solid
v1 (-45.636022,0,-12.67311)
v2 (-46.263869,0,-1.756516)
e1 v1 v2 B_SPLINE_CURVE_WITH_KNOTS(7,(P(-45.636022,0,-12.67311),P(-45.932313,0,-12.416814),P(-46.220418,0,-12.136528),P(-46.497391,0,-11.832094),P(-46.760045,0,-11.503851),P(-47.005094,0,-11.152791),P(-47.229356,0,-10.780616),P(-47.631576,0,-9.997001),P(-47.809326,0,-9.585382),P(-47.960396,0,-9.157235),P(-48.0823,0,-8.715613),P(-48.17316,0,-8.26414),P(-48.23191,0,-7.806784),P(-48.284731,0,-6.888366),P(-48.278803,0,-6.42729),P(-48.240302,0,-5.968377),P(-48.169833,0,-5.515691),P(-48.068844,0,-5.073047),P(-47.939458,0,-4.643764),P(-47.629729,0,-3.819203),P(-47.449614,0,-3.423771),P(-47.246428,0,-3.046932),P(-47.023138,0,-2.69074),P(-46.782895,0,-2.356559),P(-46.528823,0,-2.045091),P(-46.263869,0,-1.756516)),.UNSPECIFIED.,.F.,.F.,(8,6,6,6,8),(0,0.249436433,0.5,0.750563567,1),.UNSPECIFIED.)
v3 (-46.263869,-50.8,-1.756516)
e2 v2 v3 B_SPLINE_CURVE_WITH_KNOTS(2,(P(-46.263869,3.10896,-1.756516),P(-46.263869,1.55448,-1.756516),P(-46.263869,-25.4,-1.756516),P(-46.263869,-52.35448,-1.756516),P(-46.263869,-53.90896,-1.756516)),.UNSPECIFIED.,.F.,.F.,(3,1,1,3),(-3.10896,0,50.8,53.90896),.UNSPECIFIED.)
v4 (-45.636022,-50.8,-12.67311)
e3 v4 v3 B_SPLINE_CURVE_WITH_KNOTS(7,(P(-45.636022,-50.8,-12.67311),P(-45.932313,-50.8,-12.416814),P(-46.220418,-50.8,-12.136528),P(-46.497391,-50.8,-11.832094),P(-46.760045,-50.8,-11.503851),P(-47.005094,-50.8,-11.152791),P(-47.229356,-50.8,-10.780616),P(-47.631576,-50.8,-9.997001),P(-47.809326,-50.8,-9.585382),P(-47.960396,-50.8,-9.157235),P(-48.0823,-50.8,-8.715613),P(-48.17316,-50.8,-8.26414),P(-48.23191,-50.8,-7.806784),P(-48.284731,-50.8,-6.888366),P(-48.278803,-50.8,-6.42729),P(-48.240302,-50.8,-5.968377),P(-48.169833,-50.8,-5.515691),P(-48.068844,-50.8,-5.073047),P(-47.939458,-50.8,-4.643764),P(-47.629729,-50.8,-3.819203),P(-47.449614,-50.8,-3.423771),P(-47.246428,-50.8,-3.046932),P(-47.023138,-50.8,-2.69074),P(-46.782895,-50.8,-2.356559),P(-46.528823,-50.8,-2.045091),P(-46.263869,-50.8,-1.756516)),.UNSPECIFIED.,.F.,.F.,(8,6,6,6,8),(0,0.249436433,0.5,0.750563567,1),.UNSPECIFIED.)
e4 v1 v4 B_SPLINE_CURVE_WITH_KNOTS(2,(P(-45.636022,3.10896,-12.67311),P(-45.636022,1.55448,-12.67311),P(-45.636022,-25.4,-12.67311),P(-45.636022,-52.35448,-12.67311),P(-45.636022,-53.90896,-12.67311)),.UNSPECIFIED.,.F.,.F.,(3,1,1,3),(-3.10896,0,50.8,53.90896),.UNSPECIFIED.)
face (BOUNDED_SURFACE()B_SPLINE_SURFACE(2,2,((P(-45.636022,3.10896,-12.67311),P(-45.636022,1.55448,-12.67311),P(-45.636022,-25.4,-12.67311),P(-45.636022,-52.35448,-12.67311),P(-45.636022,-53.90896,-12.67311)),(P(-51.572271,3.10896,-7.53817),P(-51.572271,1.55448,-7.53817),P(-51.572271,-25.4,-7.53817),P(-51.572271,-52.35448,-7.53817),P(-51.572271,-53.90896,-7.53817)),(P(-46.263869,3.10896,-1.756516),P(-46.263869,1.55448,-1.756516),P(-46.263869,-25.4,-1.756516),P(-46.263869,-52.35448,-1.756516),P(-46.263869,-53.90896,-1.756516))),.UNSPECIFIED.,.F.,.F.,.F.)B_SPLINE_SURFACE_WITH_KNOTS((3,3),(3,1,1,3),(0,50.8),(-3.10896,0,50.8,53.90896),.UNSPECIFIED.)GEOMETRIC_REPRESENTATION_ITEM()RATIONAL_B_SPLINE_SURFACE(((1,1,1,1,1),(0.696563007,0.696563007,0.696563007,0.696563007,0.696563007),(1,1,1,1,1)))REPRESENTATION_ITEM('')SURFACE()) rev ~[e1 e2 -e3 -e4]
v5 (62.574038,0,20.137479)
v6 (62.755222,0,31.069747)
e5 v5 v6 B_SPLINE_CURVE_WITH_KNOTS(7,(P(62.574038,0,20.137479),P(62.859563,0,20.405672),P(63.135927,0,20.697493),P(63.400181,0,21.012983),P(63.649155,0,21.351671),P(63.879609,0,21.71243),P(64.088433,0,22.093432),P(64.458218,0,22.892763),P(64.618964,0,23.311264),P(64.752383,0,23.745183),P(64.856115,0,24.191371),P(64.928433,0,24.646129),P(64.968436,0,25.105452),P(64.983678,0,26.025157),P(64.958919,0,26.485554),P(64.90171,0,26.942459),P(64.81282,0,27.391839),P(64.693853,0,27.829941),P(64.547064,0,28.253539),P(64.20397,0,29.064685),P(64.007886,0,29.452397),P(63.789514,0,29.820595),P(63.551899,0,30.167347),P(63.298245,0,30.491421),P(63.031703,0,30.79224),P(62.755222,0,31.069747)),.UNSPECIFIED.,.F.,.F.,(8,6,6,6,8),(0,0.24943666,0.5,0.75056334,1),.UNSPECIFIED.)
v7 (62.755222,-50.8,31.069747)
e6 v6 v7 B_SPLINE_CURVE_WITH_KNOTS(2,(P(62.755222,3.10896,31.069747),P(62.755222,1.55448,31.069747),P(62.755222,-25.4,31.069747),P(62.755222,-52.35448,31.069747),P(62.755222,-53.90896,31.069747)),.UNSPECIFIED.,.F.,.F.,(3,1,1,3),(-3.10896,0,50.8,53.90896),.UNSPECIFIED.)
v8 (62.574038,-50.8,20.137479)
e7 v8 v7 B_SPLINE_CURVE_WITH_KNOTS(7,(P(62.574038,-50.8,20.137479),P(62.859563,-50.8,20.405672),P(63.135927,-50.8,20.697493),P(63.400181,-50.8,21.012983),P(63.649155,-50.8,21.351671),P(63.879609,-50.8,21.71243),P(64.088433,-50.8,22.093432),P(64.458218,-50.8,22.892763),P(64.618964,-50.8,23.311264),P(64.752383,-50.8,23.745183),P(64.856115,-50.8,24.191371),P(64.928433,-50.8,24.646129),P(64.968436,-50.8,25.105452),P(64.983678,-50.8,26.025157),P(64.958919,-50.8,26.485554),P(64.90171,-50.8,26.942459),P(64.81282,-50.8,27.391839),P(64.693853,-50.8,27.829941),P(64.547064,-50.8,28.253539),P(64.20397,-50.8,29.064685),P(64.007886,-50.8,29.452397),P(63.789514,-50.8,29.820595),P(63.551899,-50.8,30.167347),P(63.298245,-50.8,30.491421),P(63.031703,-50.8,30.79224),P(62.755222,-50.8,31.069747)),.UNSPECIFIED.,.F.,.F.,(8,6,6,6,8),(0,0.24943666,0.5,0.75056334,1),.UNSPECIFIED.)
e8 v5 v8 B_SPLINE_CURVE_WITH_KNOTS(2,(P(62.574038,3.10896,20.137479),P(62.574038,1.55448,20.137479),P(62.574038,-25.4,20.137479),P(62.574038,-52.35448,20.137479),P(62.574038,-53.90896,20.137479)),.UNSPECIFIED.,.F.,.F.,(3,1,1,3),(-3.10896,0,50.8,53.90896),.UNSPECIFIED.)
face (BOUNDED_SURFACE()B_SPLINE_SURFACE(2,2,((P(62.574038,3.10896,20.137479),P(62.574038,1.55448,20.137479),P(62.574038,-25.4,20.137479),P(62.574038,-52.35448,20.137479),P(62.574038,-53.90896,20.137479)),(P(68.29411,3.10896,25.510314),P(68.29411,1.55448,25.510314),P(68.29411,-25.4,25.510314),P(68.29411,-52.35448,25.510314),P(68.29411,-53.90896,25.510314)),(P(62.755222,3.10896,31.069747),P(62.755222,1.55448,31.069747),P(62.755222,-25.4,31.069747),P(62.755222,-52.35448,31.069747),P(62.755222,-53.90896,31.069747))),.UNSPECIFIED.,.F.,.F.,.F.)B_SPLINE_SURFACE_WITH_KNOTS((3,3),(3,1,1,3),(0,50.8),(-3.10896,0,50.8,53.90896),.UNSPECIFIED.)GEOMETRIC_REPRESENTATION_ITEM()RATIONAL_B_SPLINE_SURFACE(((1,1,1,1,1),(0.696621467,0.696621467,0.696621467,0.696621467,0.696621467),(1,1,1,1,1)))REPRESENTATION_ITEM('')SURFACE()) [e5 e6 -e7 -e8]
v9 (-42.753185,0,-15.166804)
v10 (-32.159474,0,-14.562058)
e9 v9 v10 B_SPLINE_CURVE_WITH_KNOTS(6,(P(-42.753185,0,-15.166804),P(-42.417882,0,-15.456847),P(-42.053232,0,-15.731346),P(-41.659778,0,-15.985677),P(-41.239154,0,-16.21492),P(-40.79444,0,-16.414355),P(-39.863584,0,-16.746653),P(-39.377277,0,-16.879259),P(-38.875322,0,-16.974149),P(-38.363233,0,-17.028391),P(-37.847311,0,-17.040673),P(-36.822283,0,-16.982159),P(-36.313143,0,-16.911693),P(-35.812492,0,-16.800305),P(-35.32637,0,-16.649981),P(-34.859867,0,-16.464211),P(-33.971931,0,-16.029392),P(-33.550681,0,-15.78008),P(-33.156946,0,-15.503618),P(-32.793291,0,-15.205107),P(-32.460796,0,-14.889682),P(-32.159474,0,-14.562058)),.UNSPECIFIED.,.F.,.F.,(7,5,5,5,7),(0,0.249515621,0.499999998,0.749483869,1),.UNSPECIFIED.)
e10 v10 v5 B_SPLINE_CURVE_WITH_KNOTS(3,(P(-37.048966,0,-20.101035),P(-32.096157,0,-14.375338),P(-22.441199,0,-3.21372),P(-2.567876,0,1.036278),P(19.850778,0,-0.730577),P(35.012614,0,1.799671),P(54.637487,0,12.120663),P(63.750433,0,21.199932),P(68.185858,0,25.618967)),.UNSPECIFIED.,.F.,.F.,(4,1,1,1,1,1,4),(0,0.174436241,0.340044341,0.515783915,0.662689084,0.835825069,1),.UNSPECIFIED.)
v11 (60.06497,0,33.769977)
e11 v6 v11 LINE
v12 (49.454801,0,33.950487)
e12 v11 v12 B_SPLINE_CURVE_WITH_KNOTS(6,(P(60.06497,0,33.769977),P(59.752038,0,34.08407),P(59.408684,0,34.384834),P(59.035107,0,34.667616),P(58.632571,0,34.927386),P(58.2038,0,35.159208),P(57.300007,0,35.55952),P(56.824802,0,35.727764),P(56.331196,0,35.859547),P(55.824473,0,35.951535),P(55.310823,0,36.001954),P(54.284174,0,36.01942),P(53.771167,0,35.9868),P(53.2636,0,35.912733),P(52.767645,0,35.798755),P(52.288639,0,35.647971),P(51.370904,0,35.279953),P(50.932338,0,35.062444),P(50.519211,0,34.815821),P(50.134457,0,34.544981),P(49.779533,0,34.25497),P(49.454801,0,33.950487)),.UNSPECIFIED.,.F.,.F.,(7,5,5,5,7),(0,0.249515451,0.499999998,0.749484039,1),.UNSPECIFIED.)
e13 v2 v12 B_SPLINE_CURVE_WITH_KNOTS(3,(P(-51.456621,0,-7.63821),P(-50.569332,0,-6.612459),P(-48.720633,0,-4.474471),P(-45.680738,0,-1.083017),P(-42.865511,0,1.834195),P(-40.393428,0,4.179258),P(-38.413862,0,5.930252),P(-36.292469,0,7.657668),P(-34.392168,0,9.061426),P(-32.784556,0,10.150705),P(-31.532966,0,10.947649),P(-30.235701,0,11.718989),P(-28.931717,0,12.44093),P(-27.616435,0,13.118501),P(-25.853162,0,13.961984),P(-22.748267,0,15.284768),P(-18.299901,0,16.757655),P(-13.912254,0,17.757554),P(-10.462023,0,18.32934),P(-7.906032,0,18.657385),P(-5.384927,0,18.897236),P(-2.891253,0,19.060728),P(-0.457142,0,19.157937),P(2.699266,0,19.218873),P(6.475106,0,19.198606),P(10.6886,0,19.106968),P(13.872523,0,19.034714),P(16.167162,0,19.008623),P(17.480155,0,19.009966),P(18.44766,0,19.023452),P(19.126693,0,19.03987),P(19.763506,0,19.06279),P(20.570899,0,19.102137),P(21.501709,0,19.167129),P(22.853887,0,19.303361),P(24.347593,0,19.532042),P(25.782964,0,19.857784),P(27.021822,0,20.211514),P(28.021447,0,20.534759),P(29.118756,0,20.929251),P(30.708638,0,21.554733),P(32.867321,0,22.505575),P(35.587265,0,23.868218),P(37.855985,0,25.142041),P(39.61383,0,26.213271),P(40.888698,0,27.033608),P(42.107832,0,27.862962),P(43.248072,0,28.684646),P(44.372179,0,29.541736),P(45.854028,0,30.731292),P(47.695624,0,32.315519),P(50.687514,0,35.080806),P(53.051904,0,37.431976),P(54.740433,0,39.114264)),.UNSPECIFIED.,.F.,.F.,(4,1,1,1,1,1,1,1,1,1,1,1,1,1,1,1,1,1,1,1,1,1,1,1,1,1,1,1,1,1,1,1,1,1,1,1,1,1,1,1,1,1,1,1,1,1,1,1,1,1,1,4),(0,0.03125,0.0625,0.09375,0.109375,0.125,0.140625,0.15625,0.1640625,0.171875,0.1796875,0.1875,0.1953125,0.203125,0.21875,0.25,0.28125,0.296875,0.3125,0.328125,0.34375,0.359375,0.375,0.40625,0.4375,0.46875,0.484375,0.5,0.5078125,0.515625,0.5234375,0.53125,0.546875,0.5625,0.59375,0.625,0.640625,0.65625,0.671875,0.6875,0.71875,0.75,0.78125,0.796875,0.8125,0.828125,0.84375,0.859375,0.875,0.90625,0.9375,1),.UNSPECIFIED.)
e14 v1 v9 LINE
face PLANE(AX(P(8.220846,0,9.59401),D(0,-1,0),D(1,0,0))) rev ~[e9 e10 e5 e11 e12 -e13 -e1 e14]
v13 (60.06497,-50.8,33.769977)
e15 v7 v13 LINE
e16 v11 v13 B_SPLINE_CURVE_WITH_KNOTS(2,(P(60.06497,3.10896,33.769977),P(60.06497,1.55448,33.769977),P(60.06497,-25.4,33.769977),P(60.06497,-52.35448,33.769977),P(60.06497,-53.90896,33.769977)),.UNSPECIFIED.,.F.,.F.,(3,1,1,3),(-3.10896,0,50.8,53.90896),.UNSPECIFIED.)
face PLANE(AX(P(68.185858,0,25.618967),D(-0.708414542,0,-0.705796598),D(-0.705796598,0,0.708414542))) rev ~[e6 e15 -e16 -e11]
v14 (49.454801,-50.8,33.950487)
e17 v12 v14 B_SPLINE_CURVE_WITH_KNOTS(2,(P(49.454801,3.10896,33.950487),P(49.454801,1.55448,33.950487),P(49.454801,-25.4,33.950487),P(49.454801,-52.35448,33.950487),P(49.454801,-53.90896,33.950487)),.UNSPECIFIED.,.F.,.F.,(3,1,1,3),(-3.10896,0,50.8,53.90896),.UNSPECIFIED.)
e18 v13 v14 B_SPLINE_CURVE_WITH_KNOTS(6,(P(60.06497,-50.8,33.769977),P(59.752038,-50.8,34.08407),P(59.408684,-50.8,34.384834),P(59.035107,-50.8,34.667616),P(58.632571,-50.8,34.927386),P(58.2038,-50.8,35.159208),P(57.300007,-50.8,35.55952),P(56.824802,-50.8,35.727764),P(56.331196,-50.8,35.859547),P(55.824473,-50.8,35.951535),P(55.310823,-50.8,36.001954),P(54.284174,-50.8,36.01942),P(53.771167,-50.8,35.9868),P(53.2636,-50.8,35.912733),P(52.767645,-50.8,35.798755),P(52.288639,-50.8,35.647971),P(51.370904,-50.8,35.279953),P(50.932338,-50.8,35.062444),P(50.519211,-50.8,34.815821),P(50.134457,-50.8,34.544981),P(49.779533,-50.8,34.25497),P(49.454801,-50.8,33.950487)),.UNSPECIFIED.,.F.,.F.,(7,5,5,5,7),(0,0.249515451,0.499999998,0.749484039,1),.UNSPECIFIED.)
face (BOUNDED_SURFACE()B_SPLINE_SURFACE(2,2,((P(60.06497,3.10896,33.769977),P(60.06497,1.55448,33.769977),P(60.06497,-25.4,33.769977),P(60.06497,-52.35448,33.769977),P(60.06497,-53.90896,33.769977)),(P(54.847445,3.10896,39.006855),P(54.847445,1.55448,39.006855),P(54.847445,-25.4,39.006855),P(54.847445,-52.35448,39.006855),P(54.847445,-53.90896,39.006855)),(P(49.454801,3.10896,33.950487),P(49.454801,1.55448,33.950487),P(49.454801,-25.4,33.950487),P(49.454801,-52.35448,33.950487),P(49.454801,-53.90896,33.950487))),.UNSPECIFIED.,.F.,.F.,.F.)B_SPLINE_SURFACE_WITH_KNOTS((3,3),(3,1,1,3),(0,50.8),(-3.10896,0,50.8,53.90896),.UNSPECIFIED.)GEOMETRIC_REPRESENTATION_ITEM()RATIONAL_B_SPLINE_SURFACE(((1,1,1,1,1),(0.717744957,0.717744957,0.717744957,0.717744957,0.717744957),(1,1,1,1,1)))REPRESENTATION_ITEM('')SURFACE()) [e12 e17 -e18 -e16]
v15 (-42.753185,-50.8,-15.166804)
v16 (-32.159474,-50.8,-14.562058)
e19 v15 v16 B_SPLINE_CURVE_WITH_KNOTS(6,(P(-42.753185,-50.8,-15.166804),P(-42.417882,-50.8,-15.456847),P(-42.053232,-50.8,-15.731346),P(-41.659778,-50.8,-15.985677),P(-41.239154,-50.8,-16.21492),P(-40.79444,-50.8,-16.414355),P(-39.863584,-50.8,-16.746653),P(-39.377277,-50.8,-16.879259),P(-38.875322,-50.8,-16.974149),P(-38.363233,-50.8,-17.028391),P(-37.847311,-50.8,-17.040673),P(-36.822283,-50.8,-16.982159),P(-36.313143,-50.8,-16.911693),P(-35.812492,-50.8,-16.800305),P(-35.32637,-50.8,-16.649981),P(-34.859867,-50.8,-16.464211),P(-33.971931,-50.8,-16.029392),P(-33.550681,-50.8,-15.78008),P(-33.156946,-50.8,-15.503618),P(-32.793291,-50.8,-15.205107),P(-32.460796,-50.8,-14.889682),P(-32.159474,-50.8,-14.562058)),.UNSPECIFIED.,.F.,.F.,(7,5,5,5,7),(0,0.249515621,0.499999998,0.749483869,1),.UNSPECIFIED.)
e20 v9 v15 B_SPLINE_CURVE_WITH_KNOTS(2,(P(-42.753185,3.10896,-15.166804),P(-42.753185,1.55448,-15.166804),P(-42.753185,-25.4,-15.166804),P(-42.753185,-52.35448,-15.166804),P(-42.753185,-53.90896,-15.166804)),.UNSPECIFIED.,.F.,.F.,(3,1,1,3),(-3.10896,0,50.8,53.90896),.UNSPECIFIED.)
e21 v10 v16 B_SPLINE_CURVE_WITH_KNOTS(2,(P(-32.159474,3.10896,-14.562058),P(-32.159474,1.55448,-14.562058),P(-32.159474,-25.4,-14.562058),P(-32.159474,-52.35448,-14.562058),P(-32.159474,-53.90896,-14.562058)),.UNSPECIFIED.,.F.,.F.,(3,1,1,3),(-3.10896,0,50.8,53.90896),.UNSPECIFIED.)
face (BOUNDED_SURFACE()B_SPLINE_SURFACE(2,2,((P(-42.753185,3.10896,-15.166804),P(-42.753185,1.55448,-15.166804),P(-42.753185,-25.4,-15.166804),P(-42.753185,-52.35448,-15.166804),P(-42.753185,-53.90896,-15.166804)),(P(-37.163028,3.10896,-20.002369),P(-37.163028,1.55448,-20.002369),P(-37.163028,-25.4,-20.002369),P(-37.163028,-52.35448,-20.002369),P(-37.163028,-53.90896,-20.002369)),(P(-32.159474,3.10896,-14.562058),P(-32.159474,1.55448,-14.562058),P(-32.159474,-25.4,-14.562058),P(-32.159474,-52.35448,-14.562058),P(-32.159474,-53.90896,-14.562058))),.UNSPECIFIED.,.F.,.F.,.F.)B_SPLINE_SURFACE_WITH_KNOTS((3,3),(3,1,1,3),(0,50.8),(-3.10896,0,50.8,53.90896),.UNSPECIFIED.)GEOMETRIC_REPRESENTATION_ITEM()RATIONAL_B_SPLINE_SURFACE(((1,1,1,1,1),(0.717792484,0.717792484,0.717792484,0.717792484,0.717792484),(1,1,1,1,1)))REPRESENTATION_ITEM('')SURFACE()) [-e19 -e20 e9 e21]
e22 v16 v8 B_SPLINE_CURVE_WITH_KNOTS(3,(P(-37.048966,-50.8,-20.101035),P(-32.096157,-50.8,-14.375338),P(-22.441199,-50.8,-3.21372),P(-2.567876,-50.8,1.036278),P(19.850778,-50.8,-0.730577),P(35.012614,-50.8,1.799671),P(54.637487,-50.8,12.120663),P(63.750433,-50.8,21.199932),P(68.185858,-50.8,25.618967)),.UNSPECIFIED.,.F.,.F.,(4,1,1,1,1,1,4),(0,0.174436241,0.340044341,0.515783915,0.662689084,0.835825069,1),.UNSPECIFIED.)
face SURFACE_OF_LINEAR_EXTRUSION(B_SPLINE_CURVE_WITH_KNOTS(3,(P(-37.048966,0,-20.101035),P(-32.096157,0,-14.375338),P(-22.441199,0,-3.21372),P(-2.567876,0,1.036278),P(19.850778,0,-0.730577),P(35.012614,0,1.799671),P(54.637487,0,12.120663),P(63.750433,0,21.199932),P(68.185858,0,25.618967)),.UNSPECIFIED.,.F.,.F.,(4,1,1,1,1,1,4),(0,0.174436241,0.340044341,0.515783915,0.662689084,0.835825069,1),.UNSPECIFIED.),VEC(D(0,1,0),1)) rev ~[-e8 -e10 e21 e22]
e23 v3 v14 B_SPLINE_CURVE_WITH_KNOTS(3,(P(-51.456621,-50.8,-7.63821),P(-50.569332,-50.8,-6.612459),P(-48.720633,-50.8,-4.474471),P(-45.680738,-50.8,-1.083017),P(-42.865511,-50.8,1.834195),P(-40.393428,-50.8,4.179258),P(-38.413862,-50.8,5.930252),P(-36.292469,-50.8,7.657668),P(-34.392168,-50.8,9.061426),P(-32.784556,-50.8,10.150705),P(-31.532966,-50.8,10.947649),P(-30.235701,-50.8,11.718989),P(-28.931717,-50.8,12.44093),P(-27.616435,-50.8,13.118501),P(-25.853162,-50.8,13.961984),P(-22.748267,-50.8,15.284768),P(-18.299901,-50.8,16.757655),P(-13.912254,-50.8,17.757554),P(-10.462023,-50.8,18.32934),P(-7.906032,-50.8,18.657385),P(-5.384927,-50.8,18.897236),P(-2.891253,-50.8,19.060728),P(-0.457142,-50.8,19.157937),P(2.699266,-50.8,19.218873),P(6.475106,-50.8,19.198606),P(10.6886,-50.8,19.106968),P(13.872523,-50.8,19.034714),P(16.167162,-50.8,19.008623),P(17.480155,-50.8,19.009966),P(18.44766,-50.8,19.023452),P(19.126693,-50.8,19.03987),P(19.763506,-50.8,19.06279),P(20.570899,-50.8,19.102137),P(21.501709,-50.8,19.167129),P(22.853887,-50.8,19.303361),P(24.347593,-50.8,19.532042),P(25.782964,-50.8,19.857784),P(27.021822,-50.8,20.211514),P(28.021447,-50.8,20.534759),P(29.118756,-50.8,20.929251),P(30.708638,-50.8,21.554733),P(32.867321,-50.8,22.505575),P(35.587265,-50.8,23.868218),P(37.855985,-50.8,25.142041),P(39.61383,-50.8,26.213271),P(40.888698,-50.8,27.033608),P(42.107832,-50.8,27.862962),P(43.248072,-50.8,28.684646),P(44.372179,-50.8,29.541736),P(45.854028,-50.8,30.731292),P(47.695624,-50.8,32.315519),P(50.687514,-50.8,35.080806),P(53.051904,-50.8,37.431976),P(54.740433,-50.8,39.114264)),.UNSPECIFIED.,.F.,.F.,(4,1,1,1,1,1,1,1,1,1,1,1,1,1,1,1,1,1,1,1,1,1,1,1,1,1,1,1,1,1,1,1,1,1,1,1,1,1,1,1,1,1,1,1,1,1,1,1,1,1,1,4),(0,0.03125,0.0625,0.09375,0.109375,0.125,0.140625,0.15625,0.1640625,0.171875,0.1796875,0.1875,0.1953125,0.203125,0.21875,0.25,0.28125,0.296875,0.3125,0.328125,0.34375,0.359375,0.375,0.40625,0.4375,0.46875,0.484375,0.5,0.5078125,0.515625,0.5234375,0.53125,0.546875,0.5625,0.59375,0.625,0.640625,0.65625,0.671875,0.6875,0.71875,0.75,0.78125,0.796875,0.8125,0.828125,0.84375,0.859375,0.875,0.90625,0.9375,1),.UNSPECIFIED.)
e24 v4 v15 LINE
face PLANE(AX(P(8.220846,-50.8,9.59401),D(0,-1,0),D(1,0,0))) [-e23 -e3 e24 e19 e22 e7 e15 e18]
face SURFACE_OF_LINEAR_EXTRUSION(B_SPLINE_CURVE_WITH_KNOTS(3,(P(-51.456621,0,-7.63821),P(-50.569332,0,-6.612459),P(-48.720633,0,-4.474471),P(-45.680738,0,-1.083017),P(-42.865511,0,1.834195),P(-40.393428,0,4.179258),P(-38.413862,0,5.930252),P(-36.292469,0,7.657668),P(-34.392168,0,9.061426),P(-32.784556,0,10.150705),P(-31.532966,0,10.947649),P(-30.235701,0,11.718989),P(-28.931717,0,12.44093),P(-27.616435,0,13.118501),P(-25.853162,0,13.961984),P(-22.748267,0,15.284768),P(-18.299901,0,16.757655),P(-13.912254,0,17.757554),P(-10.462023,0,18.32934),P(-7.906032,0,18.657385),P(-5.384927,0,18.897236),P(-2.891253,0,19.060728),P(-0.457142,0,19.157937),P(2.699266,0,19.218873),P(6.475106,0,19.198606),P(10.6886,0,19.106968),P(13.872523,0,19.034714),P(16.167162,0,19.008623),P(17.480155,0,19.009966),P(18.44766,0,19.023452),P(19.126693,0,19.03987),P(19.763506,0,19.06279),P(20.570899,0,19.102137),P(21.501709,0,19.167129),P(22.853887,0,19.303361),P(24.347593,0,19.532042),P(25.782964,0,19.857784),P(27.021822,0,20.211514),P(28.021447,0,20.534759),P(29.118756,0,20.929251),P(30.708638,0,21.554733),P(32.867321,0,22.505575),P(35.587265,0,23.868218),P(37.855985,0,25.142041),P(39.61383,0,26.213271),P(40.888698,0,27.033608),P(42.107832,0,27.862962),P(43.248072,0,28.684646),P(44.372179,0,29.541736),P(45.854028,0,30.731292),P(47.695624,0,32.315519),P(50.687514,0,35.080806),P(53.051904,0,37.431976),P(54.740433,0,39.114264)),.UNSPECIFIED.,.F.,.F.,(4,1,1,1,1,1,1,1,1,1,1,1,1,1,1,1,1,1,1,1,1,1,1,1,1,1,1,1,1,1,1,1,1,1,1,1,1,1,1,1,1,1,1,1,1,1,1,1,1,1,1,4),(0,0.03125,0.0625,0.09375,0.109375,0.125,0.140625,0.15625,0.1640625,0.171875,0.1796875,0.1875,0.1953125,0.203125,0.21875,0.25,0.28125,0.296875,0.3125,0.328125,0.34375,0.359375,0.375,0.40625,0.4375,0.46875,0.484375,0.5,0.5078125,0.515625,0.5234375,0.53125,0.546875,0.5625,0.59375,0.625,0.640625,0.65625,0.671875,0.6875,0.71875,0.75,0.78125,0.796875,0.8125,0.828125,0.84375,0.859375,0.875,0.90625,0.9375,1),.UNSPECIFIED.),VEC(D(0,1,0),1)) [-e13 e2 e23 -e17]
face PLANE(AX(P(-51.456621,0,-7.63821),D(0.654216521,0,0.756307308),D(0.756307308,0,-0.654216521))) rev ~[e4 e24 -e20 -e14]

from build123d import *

# Parameters (mm, degrees)
F1_DEPTH = 50.8
F2_R     = 7.62


# Not quite as in the source:
# - the dataset's text gives a spline's control points without its knots; the knots are read off the source's solid


with BuildPart() as f1:
    # F0 (on Front) → F1 (new body)
    with BuildSketch(Plane.XZ):
        with BuildLine():
            Line((-51.4566205376, -7.6382097449), (-37.0489656925, -20.1010350138))
            add(Edge.make_bspline(
                [(-37.0489656925, -20.1010350138), (-32.0961571271, -14.3753384093), (-22.4411994409, -3.2137201658), (-2.567876156, 1.0362784201), (19.8507775599, -0.7305766437), (35.0126136642, 1.7996710925), (54.6374865112, 12.120662721), (63.7504331122, 21.1999324541), (68.1858584285, 25.6189666688)],
                knots=[0, 0, 0, 0, 0.1744362409, 0.340044341, 0.5157839146, 0.662689084, 0.8358250694, 1, 1, 1, 1], degree=3))
            Line((68.1858584285, 25.6189666688), (54.7404326534, 39.1142642774))
            add(Edge.make_bspline(
                [(-51.4566205376, -7.6382097449), (-50.569332054, -6.6124594882), (-48.7206333421, -4.4744710724), (-45.6807379161, -1.083016907), (-42.8655113291, 1.8341952687), (-40.3934284717, 4.1792576456), (-38.413862066, 5.9302516977), (-36.2924687687, 7.6576678013), (-34.392168296, 9.0614262042), (-32.7845564877, 10.1507045755), (-31.5329658928, 10.9476488916), (-30.2357008088, 11.7189891488), (-28.9317170147, 12.440929508), (-27.6164352854, 13.1185008592), (-25.8531615823, 13.961984086), (-22.7482671671, 15.2847678022), (-18.2999008711, 16.7576548912), (-13.9122537643, 17.7575537331), (-10.4620230508, 18.3293395163), (-7.9060318762, 18.6573853028), (-5.3849265205, 18.8972362958), (-2.8912531141, 19.060728488), (-0.4571417194, 19.1579367871), (2.6992657096, 19.2188727368), (6.4751057026, 19.1986064325), (10.688599572, 19.1069677477), (13.872523357, 19.034713831), (16.1671624828, 19.0086227881), (17.4801550196, 19.0099656248), (18.4476603272, 19.0234519818), (19.126692671, 19.0398701949), (19.7635064415, 19.0627895847), (20.5708993056, 19.1021374284), (21.5017087851, 19.1671291568), (22.853887137, 19.3033614178), (24.3475932959, 19.5320424193), (25.7829635166, 19.8577835208), (27.0218215144, 20.2115138008), (28.0214471049, 20.5347589257), (29.1187561712, 20.9292509093), (30.7086380041, 21.5547332667), (32.8673205533, 22.5055753198), (35.5872650511, 23.8682182699), (37.8559849368, 25.1420412869), (39.6138298192, 26.2132708199), (40.8886976676, 27.0336077895), (42.1078319952, 27.8629622939), (43.2480720812, 28.68464647), (44.37217855, 29.5417355035), (45.8540278008, 30.7312919433), (47.6956238749, 32.3155185334), (50.6875135665, 35.0808060073), (53.0519039531, 37.4319755301), (54.7404326534, 39.1142642774)],
                knots=[0, 0, 0, 0, 0.03125, 0.0625, 0.09375, 0.109375, 0.125, 0.140625, 0.15625, 0.1640625, 0.171875, 0.1796875, 0.1875, 0.1953125, 0.203125, 0.21875, 0.25, 0.28125, 0.296875, 0.3125, 0.328125, 0.34375, 0.359375, 0.375, 0.40625, 0.4375, 0.46875, 0.484375, 0.5, 0.5078125, 0.515625, 0.5234375, 0.53125, 0.546875, 0.5625, 0.59375, 0.625, 0.640625, 0.65625, 0.671875, 0.6875, 0.71875, 0.75, 0.78125, 0.796875, 0.8125, 0.828125, 0.84375, 0.859375, 0.875, 0.90625, 0.9375, 1, 1, 1, 1], degree=3))
        make_face()
    extrude(amount=F1_DEPTH)

    # F2
    f2_edges = [f1.edges().sort_by_distance(p)[0] for p in [
        (54.740433, -25.4, 39.114264),
        (68.185858, -25.4, 25.618967),
        (-51.456621, -25.4, -7.63821),
        (-37.048966, -25.4, -20.101035),
    ]]
    fillet(f2_edges, radius=F2_R)


solid = f1.part
